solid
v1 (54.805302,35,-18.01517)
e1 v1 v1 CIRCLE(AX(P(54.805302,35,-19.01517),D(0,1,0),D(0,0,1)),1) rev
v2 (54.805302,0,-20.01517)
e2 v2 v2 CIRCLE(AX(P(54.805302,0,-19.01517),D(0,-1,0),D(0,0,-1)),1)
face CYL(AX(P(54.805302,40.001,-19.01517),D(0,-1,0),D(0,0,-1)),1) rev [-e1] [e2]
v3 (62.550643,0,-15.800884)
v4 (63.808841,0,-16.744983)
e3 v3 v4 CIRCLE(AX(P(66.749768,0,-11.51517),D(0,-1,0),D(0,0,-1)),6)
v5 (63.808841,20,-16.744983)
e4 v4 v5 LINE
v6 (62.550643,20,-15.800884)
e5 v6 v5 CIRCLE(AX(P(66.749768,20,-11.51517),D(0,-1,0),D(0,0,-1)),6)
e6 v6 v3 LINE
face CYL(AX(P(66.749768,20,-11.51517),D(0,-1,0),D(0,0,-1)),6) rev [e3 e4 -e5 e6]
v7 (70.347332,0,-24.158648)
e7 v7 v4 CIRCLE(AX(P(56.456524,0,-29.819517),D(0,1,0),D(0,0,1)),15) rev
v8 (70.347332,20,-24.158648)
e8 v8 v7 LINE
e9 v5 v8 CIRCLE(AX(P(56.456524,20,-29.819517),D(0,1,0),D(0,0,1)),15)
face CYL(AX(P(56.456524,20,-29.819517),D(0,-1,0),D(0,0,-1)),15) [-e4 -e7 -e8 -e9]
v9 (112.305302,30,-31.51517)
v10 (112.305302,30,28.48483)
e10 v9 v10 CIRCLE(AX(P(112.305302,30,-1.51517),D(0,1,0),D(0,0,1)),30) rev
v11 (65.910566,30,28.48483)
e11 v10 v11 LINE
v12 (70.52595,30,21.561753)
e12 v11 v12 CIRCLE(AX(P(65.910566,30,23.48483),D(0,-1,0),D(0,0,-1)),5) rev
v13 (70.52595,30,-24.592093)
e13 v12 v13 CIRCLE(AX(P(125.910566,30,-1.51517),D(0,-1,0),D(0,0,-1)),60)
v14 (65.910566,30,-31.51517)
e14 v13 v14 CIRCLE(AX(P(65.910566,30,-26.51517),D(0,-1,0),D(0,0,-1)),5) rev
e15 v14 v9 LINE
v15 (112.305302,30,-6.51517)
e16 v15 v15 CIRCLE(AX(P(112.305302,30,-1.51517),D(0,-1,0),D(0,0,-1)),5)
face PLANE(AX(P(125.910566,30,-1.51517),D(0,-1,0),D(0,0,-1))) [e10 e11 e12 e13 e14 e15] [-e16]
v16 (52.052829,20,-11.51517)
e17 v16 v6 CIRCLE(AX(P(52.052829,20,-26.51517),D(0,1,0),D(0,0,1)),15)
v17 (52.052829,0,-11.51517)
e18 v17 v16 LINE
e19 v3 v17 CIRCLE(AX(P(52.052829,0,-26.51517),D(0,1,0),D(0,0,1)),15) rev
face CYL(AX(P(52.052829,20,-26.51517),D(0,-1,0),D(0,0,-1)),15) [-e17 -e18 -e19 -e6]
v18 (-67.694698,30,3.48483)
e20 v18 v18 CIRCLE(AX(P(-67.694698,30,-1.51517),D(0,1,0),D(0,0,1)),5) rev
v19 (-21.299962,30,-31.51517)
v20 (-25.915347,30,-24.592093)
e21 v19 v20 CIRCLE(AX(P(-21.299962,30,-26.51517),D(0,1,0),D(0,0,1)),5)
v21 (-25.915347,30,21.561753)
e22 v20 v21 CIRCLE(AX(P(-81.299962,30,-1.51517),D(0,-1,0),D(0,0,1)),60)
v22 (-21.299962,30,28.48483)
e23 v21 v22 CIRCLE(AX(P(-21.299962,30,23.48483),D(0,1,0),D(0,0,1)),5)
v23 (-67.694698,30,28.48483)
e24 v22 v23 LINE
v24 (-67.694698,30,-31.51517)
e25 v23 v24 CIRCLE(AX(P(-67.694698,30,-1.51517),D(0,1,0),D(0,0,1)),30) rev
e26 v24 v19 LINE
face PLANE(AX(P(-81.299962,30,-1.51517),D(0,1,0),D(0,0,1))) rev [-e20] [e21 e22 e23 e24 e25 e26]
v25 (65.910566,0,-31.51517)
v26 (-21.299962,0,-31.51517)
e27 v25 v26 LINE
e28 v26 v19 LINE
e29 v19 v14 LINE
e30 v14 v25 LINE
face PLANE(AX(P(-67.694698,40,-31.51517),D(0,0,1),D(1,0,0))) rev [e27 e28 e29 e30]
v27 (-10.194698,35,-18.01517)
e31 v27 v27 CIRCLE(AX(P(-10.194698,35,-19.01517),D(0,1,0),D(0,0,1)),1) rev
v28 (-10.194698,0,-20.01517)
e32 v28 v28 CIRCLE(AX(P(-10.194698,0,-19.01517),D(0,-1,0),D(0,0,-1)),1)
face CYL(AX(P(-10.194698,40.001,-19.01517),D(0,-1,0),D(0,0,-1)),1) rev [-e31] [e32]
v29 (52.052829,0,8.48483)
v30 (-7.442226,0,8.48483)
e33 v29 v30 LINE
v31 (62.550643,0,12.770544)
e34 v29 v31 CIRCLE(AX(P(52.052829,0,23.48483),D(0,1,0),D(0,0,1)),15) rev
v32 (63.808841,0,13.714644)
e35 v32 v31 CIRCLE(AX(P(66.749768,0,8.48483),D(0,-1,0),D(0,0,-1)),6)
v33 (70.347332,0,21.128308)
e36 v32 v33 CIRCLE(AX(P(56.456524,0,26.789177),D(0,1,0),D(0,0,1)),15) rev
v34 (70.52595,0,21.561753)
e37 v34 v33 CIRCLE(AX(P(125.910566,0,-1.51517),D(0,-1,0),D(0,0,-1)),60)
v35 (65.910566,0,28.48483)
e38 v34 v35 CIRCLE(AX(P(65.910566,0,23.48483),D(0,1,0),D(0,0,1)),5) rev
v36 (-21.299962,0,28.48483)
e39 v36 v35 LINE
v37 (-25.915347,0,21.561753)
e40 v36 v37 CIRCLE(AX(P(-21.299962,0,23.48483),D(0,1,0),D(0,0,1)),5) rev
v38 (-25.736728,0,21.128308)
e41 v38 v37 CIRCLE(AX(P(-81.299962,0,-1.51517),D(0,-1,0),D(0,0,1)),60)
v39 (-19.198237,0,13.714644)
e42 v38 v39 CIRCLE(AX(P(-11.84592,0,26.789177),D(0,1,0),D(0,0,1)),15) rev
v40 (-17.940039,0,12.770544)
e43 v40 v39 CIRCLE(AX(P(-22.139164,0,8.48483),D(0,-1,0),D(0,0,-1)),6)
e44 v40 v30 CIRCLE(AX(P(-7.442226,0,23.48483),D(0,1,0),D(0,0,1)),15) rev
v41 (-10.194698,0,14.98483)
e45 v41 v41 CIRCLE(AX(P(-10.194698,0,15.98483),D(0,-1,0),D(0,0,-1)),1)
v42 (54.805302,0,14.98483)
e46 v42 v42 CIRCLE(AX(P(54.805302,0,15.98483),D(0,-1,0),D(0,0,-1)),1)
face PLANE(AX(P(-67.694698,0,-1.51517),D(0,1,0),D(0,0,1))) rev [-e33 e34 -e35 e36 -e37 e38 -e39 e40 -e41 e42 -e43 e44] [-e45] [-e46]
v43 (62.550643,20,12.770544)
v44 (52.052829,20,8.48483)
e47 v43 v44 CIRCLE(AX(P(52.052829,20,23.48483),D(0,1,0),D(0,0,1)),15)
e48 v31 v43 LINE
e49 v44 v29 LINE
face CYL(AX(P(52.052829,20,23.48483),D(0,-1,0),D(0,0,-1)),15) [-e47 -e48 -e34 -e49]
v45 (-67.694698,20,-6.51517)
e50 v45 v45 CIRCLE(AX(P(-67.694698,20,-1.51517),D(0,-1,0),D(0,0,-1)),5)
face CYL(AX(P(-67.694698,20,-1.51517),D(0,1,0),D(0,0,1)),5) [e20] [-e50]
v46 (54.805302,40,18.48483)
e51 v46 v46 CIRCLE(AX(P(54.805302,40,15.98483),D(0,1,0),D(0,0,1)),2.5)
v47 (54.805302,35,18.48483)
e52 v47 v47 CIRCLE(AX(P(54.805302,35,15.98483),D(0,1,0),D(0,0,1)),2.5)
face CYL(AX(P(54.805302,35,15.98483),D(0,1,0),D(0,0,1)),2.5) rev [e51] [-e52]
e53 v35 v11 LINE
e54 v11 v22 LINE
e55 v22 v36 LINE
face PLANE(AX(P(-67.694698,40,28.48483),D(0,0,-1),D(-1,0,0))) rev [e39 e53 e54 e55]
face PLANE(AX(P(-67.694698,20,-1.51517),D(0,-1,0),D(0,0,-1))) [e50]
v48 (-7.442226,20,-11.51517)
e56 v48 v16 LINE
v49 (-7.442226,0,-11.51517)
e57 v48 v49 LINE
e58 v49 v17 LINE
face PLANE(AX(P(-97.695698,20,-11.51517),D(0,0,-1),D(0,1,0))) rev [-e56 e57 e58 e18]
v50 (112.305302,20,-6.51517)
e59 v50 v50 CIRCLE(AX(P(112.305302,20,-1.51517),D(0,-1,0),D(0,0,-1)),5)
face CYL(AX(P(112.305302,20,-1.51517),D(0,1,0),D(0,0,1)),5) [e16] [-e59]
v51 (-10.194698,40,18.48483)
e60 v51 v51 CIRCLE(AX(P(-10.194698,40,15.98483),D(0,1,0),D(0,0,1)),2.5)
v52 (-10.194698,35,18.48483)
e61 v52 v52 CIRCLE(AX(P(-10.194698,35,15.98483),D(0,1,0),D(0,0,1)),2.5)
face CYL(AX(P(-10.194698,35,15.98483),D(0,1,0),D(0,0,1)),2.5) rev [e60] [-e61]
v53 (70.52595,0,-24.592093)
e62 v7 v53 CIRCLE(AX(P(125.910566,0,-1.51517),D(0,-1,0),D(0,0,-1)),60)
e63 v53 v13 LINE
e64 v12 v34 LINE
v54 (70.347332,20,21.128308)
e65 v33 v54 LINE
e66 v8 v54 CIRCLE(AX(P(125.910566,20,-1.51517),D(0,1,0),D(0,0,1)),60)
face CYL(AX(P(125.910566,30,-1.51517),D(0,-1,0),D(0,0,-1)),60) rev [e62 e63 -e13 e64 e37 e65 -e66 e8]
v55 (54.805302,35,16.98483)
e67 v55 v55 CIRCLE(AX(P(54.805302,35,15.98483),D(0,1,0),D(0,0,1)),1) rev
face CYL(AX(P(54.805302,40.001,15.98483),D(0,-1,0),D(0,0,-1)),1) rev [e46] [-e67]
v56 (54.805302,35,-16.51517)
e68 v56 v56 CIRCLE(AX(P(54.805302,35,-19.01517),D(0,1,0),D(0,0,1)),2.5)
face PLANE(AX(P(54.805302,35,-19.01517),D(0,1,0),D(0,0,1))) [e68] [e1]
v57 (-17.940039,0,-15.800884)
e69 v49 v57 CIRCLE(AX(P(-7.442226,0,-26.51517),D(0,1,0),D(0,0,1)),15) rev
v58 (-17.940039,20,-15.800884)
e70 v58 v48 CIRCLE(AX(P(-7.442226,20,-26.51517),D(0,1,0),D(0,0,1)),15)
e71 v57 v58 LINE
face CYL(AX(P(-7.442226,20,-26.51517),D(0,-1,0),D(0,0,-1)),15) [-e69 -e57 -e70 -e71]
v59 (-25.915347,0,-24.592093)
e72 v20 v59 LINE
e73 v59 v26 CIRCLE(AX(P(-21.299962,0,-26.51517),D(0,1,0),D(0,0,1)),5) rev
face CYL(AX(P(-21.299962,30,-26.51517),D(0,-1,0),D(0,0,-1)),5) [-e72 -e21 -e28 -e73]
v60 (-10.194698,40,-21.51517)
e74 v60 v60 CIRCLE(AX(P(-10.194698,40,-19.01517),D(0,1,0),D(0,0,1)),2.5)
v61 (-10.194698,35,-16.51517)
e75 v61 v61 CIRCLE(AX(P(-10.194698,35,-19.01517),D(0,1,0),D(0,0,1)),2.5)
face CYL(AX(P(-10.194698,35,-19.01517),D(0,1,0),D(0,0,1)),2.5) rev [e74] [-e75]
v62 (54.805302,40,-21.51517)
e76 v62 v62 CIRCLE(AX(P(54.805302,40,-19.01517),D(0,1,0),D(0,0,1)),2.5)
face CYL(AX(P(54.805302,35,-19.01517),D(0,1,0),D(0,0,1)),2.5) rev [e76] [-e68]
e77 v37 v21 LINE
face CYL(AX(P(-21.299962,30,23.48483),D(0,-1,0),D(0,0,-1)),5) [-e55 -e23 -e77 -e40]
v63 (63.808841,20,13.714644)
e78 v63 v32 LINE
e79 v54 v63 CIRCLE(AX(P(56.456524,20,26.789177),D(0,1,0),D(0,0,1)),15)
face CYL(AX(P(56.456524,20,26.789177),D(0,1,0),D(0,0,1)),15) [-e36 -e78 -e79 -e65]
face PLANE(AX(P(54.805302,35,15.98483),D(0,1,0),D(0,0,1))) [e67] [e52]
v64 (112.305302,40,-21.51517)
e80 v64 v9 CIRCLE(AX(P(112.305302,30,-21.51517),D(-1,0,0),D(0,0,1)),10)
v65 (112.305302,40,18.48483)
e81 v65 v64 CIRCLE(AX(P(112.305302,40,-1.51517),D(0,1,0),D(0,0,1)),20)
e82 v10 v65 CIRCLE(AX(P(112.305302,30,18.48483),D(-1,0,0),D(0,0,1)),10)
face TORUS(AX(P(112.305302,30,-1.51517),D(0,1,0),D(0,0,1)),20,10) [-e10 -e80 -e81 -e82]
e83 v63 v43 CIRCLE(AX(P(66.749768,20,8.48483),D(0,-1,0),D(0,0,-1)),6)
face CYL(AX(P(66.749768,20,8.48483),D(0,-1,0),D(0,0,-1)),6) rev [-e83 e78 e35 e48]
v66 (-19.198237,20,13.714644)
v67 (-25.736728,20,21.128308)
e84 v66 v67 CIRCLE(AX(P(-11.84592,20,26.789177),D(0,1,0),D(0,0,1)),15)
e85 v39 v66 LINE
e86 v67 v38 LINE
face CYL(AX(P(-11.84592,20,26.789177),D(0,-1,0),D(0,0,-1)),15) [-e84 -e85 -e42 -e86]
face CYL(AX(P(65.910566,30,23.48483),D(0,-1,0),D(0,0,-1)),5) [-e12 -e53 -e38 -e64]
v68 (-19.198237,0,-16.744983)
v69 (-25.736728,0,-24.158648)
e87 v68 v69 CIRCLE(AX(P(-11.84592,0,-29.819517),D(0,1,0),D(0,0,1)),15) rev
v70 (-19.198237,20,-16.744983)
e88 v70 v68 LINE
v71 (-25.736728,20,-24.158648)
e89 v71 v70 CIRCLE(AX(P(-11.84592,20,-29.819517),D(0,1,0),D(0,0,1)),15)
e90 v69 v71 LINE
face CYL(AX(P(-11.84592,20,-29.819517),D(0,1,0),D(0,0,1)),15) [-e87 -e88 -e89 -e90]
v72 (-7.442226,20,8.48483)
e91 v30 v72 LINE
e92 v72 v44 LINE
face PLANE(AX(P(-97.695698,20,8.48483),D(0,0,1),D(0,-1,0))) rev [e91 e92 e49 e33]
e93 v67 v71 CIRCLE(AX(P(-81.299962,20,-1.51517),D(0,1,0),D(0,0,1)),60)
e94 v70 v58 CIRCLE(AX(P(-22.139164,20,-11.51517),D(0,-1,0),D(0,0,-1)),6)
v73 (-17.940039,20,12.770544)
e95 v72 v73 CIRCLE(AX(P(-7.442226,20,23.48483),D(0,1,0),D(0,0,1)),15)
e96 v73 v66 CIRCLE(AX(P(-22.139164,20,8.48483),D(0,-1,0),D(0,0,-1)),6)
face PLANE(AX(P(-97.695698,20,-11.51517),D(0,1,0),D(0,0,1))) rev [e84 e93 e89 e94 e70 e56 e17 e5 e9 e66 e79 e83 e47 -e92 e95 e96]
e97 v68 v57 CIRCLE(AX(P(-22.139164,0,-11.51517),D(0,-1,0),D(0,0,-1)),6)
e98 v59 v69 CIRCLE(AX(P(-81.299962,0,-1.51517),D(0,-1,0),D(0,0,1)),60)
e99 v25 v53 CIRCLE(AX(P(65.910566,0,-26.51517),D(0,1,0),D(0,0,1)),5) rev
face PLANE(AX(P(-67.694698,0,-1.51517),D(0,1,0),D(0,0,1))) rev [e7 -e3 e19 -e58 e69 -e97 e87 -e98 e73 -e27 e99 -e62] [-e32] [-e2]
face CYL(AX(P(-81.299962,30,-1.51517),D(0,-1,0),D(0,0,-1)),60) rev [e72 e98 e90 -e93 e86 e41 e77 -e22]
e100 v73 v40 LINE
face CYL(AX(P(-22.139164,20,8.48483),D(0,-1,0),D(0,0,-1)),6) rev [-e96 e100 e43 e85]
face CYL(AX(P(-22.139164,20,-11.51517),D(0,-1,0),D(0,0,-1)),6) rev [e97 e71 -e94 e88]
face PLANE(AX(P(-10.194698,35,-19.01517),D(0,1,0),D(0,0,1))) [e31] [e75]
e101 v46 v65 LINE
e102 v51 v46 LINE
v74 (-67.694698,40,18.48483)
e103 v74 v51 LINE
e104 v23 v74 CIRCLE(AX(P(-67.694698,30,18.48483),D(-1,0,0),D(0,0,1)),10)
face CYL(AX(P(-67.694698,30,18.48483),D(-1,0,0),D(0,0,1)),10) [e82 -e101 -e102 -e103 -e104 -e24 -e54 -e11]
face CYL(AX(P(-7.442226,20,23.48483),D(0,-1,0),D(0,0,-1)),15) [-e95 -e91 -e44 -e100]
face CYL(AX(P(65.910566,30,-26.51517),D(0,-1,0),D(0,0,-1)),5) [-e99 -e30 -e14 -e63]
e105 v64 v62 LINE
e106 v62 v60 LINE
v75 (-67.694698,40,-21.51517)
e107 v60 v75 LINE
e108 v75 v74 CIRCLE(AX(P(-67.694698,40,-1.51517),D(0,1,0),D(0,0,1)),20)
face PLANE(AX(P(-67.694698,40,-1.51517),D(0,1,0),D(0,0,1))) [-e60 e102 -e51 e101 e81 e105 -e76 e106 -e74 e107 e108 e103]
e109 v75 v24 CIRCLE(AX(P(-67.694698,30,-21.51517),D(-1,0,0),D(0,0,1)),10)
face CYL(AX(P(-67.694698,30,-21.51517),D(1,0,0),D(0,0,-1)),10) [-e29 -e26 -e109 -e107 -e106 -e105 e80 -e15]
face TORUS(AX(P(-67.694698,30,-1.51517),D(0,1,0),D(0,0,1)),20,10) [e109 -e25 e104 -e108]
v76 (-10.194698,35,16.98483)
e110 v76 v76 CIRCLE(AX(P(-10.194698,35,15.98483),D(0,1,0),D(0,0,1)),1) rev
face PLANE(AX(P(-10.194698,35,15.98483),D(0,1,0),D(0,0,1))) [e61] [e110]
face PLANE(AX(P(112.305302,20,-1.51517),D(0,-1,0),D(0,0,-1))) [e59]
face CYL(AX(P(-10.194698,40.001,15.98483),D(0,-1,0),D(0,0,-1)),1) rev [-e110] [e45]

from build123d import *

# Parameters (mm, degrees)
BOSS_EXTRUDE1_DEPTH     = 40
FILLET1_R               = 10
CUT_EXTRUDE1_DEPTH      = 30
SKETCH4_R               = 5
BOSS_EXTRUDE3_DEPTH     = 10
CUT_EXTRUDE2_REACH      = 181.038
CUT_EXTRUDE2_END_RADIUS = 60
SKETCH5_W               = 20
SKETCH5_H               = 40
FILLET2_R               = 5
CUT_EXTRUDE3_REACH      = 153.142
SKETCH6_R               = 1
SKETCH7_R               = 2.5
CUT_EXTRUDE4_DEPTH      = 5
SKETCH8_R               = 6
CUT_EXTRUDE5_DEPTH      = 20
FILLET3_R               = 15


with BuildPart() as part:
    # Sketch1 → Boss-Extrude1 (new body)
    with BuildSketch(Plane(origin=(0, 0, 0), x_dir=(1, 0, 0), z_dir=(0, 1, 0))):
        with BuildLine():
            Line((-67.694698117, 31.515169882), (112.305301883, 31.515169882))
            ThreePointArc((112.305301883, 31.515169882), (142.305301883, 1.515169882), (112.305301883, -28.484830118))
            Line((112.305301883, -28.484830118), (-67.694698117, -28.484830118))
            ThreePointArc((-67.694698117, -28.484830118), (-97.694698117, 1.515169882), (-67.694698117, 31.515169882))
        make_face()
    extrude(amount=BOSS_EXTRUDE1_DEPTH)

    # Fillet1
    fillet1_edges = [part.edges().sort_by_distance(p)[0] for p in [
        (142.305301883, 40, -1.515169882),
        (22.305301883, 40, -31.515169882),
        (-97.694698117, 40, -1.515169882),
        (22.305301883, 40, 28.484830118),
    ]]
    fillet(fillet1_edges, radius=FILLET1_R)

    # Sketch3 → Cut-Extrude1 (cut)
    with BuildSketch(Plane.XZ):
        with BuildLine():
            Line((73.949041486, -31.515169882), (148.949041486, -31.515169882))
            Line((148.949041486, -31.515169882), (148.949041486, 28.484830118))
            Line((148.949041486, 28.484830118), (73.949041486, 28.484830118))
            ThreePointArc((73.949041486, 28.484830118), (65.910565713, -1.515169882), (73.949041486, -31.515169882))
        make_face()
        with BuildLine():
            Line((-29.33843772, 28.484830118), (-104.33843772, 28.484830118))
            Line((-104.33843772, 28.484830118), (-104.33843772, -31.515169882))
            Line((-104.33843772, -31.515169882), (-29.33843772, -31.515169882))
            ThreePointArc((-29.33843772, -31.515169882), (-21.299961947, -1.515169882), (-29.33843772, 28.484830118))
        make_face()
    extrude(amount=-CUT_EXTRUDE1_DEPTH, mode=Mode.SUBTRACT)

    # Sketch4 → Boss-Extrude3 (add)
    with BuildSketch(Plane(origin=(0, 30, 0), x_dir=(-1, 0, 0), z_dir=(0, -1, 0))):
        with Locations(Location((-112.305301883, 1.515169882, 0), (0, 0, 90))):
            Circle(SKETCH4_R)
        with Locations(Location((67.694698117, 1.515169882, 0), (0, 0, 270))):
            Circle(SKETCH4_R)
    extrude(amount=BOSS_EXTRUDE3_DEPTH)

    # Cut-Extrude2: up to this cylinder (the profile starts outside it)
    cut_extrude2_end = Plane(origin=(-81.299961947, 0, -1.515169882), z_dir=(0, -1, 0)) * Cylinder(CUT_EXTRUDE2_END_RADIUS, 483.076, mode=Mode.PRIVATE)
    # Sketch5 → Cut-Extrude2 (cut, up to the surface)
    with BuildSketch(Plane(origin=(73.949041486, 0, 0), x_dir=(0, 0, -1), z_dir=(1, 0, 0)), mode=Mode.PRIVATE) as cut_extrude2_sk1:
        with Locations((1.515169882, 0)):
            Rectangle(SKETCH5_W, SKETCH5_H)
    cut_extrude2_tool1 = extrude(cut_extrude2_sk1.sketch, amount=-CUT_EXTRUDE2_REACH, mode=Mode.PRIVATE) - cut_extrude2_end
    add(cut_extrude2_tool1.solids().sort_by_distance((73.949041, 0, -1.51517))[0], mode=Mode.SUBTRACT)

    # Fillet2
    # the kernel refuses this fillet: 5 mm, written as the material it takes off along each edge
    with BuildSketch(Plane(origin=(-29.33843772, -20.096189432, 28.484830118), x_dir=(0.44322659401027775, 0, -0.8964096085841831), z_dir=(0, 1, 0))) as fillet2_piece_1:
        with BuildLine():
            CenterArc((8.044914281, -4.989633951), FILLET2_R, 93.690067526, 112.619864948)
            Line((3.562866238, -7.205766921), (0, 0))
            ThreePointArc((0, 0), (3.861558855, -0.124392586), (7.72311771, 0))
        make_face()
    extrude(amount=50.096189432, mode=Mode.SUBTRACT)
    with BuildSketch(Plane(origin=(-29.33843772, -20.096189432, -31.515169882), x_dir=(1, 0, 0), z_dir=(0, 1, 0))) as fillet2_piece_2:
        with BuildLine():
            CenterArc((8.038475773, -5), FILLET2_R, 90, 112.619864948)
            ThreePointArc((3.423091158, -6.923076923), (1.823052288, -3.406404359), (0, 0))
            Line((0, 0), (8.038475773, 0))
        make_face()
    extrude(amount=50.096189432, mode=Mode.SUBTRACT)
    with BuildSketch(Plane(origin=(73.949041486, -20.096189432, -31.515169882), x_dir=(-1, 0, 0), z_dir=(0, 1, 0))) as fillet2_piece_3:
        with BuildLine():
            CenterArc((8.038475773, 5), FILLET2_R, 157.380135052, 112.619864948)
            ThreePointArc((3.423091158, 6.923076923), (1.823052288, 3.406404359), (0, 0))
            Line((0, 0), (8.038475773, 0))
        make_face()
    extrude(amount=50.096189432, mode=Mode.SUBTRACT)
    with BuildSketch(Plane(origin=(73.949041486, -20.096189432, 28.484830118), x_dir=(-0.4432265940102763, 0, -0.8964096085841838), z_dir=(0, 1, 0))) as fillet2_piece_4:
        with BuildLine():
            CenterArc((8.044914281, 4.989633951), FILLET2_R, 153.690067526, 112.619864948)
            Line((3.562866238, 7.205766921), (0, 0))
            ThreePointArc((0, 0), (3.861558855, 0.124392586), (7.72311771, 0))
        make_face()
    extrude(amount=50.096189432, mode=Mode.SUBTRACT)

    # Sketch6 → Cut-Extrude3 (cut, up to next)
    with BuildSketch(Plane(origin=(0, 0, 0), x_dir=(-1, 0, 0), z_dir=(0, -1, 0)), mode=Mode.PRIVATE) as cut_extrude3_sk1:
        with Locations(Location((10.194698117, -15.984830118, 0), (0, 0, 90))):
            Circle(SKETCH6_R)
    cut_extrude3_tool1 = extrude(cut_extrude3_sk1.sketch, amount=-CUT_EXTRUDE3_REACH, mode=Mode.PRIVATE) & part.part
    # Sketch6 → Cut-Extrude3 (cut, up to next)
    with BuildSketch(Plane(origin=(0, 0, 0), x_dir=(-1, 0, 0), z_dir=(0, -1, 0)), mode=Mode.PRIVATE) as cut_extrude3_sk2:
        with Locations(Location((-54.805301883, -15.984830118, 0), (0, 0, 90))):
            Circle(SKETCH6_R)
    cut_extrude3_tool2 = extrude(cut_extrude3_sk2.sketch, amount=-CUT_EXTRUDE3_REACH, mode=Mode.PRIVATE) & part.part
    # Sketch6 → Cut-Extrude3 (cut, up to next)
    with BuildSketch(Plane(origin=(0, 0, 0), x_dir=(-1, 0, 0), z_dir=(0, -1, 0)), mode=Mode.PRIVATE) as cut_extrude3_sk3:
        with Locations(Location((-54.805301883, 19.015169882, 0), (0, 0, 90))):
            Circle(SKETCH6_R)
    cut_extrude3_tool3 = extrude(cut_extrude3_sk3.sketch, amount=-CUT_EXTRUDE3_REACH, mode=Mode.PRIVATE) & part.part
    # Sketch6 → Cut-Extrude3 (cut, up to next)
    with BuildSketch(Plane(origin=(0, 0, 0), x_dir=(-1, 0, 0), z_dir=(0, -1, 0)), mode=Mode.PRIVATE) as cut_extrude3_sk4:
        with Locations(Location((10.194698117, 19.015169882, 0), (0, 0, 90))):
            Circle(SKETCH6_R)
    cut_extrude3_tool4 = extrude(cut_extrude3_sk4.sketch, amount=-CUT_EXTRUDE3_REACH, mode=Mode.PRIVATE) & part.part
    add(cut_extrude3_tool1.solids().sort_by_distance((-10.194698, 0, 15.98483))[0], mode=Mode.SUBTRACT)
    add(cut_extrude3_tool2.solids().sort_by_distance((54.805302, 0, 15.98483))[0], mode=Mode.SUBTRACT)
    add(cut_extrude3_tool3.solids().sort_by_distance((54.805302, 0, -19.01517))[0], mode=Mode.SUBTRACT)
    add(cut_extrude3_tool4.solids().sort_by_distance((-10.194698, 0, -19.01517))[0], mode=Mode.SUBTRACT)

    # Sketch7 → Cut-Extrude4 (cut)
    with BuildSketch(Plane(origin=(0, 40, 0), x_dir=(1, 0, 0), z_dir=(0, 1, 0))):
        with Locations(Location((-10.194698117, 19.015169882, 0), (0, 0, 270))):
            Circle(SKETCH7_R)
        with Locations(Location((-10.194698117, -15.984830118, 0), (0, 0, 270))):
            Circle(SKETCH7_R)
        with Locations(Location((54.805301883, -15.984830118, 0), (0, 0, 270))):
            Circle(SKETCH7_R)
        with Locations(Location((54.805301883, 19.015169882, 0), (0, 0, 270))):
            Circle(SKETCH7_R)
    extrude(amount=-CUT_EXTRUDE4_DEPTH, mode=Mode.SUBTRACT)

    # Sketch8 → Cut-Extrude5 (cut)
    with BuildSketch(Plane.XZ):
        with Locations((-22.139164116, 8.484830118)):
            Circle(SKETCH8_R)
        with Locations((-22.139164116, -11.515169882)):
            Circle(SKETCH8_R)
        with Locations((66.749767882, -11.515169882)):
            Circle(SKETCH8_R)
        with Locations((66.749767882, 8.484830118)):
            Circle(SKETCH8_R)
    extrude(amount=-CUT_EXTRUDE5_DEPTH, mode=Mode.SUBTRACT)

    # Fillet3
    fillet3_edges = [part.edges().sort_by_distance(p)[0] for p in [
        (-16.139164116, 10, -11.515169882),
        (60.749767882, 10, -11.515169882),
        (68.044321089, 10, 14.343510174),
        (60.749767882, 10, 8.484830118),
        (68.044321089, 10, -17.373849938),
        (-23.433717323, 10, -17.373849938),
        (-23.433717323, 10, 14.343510174),
        (-16.139164116, 10, 8.484830118),
    ]]
    fillet(fillet3_edges, radius=FILLET3_R)


solid = part.part
